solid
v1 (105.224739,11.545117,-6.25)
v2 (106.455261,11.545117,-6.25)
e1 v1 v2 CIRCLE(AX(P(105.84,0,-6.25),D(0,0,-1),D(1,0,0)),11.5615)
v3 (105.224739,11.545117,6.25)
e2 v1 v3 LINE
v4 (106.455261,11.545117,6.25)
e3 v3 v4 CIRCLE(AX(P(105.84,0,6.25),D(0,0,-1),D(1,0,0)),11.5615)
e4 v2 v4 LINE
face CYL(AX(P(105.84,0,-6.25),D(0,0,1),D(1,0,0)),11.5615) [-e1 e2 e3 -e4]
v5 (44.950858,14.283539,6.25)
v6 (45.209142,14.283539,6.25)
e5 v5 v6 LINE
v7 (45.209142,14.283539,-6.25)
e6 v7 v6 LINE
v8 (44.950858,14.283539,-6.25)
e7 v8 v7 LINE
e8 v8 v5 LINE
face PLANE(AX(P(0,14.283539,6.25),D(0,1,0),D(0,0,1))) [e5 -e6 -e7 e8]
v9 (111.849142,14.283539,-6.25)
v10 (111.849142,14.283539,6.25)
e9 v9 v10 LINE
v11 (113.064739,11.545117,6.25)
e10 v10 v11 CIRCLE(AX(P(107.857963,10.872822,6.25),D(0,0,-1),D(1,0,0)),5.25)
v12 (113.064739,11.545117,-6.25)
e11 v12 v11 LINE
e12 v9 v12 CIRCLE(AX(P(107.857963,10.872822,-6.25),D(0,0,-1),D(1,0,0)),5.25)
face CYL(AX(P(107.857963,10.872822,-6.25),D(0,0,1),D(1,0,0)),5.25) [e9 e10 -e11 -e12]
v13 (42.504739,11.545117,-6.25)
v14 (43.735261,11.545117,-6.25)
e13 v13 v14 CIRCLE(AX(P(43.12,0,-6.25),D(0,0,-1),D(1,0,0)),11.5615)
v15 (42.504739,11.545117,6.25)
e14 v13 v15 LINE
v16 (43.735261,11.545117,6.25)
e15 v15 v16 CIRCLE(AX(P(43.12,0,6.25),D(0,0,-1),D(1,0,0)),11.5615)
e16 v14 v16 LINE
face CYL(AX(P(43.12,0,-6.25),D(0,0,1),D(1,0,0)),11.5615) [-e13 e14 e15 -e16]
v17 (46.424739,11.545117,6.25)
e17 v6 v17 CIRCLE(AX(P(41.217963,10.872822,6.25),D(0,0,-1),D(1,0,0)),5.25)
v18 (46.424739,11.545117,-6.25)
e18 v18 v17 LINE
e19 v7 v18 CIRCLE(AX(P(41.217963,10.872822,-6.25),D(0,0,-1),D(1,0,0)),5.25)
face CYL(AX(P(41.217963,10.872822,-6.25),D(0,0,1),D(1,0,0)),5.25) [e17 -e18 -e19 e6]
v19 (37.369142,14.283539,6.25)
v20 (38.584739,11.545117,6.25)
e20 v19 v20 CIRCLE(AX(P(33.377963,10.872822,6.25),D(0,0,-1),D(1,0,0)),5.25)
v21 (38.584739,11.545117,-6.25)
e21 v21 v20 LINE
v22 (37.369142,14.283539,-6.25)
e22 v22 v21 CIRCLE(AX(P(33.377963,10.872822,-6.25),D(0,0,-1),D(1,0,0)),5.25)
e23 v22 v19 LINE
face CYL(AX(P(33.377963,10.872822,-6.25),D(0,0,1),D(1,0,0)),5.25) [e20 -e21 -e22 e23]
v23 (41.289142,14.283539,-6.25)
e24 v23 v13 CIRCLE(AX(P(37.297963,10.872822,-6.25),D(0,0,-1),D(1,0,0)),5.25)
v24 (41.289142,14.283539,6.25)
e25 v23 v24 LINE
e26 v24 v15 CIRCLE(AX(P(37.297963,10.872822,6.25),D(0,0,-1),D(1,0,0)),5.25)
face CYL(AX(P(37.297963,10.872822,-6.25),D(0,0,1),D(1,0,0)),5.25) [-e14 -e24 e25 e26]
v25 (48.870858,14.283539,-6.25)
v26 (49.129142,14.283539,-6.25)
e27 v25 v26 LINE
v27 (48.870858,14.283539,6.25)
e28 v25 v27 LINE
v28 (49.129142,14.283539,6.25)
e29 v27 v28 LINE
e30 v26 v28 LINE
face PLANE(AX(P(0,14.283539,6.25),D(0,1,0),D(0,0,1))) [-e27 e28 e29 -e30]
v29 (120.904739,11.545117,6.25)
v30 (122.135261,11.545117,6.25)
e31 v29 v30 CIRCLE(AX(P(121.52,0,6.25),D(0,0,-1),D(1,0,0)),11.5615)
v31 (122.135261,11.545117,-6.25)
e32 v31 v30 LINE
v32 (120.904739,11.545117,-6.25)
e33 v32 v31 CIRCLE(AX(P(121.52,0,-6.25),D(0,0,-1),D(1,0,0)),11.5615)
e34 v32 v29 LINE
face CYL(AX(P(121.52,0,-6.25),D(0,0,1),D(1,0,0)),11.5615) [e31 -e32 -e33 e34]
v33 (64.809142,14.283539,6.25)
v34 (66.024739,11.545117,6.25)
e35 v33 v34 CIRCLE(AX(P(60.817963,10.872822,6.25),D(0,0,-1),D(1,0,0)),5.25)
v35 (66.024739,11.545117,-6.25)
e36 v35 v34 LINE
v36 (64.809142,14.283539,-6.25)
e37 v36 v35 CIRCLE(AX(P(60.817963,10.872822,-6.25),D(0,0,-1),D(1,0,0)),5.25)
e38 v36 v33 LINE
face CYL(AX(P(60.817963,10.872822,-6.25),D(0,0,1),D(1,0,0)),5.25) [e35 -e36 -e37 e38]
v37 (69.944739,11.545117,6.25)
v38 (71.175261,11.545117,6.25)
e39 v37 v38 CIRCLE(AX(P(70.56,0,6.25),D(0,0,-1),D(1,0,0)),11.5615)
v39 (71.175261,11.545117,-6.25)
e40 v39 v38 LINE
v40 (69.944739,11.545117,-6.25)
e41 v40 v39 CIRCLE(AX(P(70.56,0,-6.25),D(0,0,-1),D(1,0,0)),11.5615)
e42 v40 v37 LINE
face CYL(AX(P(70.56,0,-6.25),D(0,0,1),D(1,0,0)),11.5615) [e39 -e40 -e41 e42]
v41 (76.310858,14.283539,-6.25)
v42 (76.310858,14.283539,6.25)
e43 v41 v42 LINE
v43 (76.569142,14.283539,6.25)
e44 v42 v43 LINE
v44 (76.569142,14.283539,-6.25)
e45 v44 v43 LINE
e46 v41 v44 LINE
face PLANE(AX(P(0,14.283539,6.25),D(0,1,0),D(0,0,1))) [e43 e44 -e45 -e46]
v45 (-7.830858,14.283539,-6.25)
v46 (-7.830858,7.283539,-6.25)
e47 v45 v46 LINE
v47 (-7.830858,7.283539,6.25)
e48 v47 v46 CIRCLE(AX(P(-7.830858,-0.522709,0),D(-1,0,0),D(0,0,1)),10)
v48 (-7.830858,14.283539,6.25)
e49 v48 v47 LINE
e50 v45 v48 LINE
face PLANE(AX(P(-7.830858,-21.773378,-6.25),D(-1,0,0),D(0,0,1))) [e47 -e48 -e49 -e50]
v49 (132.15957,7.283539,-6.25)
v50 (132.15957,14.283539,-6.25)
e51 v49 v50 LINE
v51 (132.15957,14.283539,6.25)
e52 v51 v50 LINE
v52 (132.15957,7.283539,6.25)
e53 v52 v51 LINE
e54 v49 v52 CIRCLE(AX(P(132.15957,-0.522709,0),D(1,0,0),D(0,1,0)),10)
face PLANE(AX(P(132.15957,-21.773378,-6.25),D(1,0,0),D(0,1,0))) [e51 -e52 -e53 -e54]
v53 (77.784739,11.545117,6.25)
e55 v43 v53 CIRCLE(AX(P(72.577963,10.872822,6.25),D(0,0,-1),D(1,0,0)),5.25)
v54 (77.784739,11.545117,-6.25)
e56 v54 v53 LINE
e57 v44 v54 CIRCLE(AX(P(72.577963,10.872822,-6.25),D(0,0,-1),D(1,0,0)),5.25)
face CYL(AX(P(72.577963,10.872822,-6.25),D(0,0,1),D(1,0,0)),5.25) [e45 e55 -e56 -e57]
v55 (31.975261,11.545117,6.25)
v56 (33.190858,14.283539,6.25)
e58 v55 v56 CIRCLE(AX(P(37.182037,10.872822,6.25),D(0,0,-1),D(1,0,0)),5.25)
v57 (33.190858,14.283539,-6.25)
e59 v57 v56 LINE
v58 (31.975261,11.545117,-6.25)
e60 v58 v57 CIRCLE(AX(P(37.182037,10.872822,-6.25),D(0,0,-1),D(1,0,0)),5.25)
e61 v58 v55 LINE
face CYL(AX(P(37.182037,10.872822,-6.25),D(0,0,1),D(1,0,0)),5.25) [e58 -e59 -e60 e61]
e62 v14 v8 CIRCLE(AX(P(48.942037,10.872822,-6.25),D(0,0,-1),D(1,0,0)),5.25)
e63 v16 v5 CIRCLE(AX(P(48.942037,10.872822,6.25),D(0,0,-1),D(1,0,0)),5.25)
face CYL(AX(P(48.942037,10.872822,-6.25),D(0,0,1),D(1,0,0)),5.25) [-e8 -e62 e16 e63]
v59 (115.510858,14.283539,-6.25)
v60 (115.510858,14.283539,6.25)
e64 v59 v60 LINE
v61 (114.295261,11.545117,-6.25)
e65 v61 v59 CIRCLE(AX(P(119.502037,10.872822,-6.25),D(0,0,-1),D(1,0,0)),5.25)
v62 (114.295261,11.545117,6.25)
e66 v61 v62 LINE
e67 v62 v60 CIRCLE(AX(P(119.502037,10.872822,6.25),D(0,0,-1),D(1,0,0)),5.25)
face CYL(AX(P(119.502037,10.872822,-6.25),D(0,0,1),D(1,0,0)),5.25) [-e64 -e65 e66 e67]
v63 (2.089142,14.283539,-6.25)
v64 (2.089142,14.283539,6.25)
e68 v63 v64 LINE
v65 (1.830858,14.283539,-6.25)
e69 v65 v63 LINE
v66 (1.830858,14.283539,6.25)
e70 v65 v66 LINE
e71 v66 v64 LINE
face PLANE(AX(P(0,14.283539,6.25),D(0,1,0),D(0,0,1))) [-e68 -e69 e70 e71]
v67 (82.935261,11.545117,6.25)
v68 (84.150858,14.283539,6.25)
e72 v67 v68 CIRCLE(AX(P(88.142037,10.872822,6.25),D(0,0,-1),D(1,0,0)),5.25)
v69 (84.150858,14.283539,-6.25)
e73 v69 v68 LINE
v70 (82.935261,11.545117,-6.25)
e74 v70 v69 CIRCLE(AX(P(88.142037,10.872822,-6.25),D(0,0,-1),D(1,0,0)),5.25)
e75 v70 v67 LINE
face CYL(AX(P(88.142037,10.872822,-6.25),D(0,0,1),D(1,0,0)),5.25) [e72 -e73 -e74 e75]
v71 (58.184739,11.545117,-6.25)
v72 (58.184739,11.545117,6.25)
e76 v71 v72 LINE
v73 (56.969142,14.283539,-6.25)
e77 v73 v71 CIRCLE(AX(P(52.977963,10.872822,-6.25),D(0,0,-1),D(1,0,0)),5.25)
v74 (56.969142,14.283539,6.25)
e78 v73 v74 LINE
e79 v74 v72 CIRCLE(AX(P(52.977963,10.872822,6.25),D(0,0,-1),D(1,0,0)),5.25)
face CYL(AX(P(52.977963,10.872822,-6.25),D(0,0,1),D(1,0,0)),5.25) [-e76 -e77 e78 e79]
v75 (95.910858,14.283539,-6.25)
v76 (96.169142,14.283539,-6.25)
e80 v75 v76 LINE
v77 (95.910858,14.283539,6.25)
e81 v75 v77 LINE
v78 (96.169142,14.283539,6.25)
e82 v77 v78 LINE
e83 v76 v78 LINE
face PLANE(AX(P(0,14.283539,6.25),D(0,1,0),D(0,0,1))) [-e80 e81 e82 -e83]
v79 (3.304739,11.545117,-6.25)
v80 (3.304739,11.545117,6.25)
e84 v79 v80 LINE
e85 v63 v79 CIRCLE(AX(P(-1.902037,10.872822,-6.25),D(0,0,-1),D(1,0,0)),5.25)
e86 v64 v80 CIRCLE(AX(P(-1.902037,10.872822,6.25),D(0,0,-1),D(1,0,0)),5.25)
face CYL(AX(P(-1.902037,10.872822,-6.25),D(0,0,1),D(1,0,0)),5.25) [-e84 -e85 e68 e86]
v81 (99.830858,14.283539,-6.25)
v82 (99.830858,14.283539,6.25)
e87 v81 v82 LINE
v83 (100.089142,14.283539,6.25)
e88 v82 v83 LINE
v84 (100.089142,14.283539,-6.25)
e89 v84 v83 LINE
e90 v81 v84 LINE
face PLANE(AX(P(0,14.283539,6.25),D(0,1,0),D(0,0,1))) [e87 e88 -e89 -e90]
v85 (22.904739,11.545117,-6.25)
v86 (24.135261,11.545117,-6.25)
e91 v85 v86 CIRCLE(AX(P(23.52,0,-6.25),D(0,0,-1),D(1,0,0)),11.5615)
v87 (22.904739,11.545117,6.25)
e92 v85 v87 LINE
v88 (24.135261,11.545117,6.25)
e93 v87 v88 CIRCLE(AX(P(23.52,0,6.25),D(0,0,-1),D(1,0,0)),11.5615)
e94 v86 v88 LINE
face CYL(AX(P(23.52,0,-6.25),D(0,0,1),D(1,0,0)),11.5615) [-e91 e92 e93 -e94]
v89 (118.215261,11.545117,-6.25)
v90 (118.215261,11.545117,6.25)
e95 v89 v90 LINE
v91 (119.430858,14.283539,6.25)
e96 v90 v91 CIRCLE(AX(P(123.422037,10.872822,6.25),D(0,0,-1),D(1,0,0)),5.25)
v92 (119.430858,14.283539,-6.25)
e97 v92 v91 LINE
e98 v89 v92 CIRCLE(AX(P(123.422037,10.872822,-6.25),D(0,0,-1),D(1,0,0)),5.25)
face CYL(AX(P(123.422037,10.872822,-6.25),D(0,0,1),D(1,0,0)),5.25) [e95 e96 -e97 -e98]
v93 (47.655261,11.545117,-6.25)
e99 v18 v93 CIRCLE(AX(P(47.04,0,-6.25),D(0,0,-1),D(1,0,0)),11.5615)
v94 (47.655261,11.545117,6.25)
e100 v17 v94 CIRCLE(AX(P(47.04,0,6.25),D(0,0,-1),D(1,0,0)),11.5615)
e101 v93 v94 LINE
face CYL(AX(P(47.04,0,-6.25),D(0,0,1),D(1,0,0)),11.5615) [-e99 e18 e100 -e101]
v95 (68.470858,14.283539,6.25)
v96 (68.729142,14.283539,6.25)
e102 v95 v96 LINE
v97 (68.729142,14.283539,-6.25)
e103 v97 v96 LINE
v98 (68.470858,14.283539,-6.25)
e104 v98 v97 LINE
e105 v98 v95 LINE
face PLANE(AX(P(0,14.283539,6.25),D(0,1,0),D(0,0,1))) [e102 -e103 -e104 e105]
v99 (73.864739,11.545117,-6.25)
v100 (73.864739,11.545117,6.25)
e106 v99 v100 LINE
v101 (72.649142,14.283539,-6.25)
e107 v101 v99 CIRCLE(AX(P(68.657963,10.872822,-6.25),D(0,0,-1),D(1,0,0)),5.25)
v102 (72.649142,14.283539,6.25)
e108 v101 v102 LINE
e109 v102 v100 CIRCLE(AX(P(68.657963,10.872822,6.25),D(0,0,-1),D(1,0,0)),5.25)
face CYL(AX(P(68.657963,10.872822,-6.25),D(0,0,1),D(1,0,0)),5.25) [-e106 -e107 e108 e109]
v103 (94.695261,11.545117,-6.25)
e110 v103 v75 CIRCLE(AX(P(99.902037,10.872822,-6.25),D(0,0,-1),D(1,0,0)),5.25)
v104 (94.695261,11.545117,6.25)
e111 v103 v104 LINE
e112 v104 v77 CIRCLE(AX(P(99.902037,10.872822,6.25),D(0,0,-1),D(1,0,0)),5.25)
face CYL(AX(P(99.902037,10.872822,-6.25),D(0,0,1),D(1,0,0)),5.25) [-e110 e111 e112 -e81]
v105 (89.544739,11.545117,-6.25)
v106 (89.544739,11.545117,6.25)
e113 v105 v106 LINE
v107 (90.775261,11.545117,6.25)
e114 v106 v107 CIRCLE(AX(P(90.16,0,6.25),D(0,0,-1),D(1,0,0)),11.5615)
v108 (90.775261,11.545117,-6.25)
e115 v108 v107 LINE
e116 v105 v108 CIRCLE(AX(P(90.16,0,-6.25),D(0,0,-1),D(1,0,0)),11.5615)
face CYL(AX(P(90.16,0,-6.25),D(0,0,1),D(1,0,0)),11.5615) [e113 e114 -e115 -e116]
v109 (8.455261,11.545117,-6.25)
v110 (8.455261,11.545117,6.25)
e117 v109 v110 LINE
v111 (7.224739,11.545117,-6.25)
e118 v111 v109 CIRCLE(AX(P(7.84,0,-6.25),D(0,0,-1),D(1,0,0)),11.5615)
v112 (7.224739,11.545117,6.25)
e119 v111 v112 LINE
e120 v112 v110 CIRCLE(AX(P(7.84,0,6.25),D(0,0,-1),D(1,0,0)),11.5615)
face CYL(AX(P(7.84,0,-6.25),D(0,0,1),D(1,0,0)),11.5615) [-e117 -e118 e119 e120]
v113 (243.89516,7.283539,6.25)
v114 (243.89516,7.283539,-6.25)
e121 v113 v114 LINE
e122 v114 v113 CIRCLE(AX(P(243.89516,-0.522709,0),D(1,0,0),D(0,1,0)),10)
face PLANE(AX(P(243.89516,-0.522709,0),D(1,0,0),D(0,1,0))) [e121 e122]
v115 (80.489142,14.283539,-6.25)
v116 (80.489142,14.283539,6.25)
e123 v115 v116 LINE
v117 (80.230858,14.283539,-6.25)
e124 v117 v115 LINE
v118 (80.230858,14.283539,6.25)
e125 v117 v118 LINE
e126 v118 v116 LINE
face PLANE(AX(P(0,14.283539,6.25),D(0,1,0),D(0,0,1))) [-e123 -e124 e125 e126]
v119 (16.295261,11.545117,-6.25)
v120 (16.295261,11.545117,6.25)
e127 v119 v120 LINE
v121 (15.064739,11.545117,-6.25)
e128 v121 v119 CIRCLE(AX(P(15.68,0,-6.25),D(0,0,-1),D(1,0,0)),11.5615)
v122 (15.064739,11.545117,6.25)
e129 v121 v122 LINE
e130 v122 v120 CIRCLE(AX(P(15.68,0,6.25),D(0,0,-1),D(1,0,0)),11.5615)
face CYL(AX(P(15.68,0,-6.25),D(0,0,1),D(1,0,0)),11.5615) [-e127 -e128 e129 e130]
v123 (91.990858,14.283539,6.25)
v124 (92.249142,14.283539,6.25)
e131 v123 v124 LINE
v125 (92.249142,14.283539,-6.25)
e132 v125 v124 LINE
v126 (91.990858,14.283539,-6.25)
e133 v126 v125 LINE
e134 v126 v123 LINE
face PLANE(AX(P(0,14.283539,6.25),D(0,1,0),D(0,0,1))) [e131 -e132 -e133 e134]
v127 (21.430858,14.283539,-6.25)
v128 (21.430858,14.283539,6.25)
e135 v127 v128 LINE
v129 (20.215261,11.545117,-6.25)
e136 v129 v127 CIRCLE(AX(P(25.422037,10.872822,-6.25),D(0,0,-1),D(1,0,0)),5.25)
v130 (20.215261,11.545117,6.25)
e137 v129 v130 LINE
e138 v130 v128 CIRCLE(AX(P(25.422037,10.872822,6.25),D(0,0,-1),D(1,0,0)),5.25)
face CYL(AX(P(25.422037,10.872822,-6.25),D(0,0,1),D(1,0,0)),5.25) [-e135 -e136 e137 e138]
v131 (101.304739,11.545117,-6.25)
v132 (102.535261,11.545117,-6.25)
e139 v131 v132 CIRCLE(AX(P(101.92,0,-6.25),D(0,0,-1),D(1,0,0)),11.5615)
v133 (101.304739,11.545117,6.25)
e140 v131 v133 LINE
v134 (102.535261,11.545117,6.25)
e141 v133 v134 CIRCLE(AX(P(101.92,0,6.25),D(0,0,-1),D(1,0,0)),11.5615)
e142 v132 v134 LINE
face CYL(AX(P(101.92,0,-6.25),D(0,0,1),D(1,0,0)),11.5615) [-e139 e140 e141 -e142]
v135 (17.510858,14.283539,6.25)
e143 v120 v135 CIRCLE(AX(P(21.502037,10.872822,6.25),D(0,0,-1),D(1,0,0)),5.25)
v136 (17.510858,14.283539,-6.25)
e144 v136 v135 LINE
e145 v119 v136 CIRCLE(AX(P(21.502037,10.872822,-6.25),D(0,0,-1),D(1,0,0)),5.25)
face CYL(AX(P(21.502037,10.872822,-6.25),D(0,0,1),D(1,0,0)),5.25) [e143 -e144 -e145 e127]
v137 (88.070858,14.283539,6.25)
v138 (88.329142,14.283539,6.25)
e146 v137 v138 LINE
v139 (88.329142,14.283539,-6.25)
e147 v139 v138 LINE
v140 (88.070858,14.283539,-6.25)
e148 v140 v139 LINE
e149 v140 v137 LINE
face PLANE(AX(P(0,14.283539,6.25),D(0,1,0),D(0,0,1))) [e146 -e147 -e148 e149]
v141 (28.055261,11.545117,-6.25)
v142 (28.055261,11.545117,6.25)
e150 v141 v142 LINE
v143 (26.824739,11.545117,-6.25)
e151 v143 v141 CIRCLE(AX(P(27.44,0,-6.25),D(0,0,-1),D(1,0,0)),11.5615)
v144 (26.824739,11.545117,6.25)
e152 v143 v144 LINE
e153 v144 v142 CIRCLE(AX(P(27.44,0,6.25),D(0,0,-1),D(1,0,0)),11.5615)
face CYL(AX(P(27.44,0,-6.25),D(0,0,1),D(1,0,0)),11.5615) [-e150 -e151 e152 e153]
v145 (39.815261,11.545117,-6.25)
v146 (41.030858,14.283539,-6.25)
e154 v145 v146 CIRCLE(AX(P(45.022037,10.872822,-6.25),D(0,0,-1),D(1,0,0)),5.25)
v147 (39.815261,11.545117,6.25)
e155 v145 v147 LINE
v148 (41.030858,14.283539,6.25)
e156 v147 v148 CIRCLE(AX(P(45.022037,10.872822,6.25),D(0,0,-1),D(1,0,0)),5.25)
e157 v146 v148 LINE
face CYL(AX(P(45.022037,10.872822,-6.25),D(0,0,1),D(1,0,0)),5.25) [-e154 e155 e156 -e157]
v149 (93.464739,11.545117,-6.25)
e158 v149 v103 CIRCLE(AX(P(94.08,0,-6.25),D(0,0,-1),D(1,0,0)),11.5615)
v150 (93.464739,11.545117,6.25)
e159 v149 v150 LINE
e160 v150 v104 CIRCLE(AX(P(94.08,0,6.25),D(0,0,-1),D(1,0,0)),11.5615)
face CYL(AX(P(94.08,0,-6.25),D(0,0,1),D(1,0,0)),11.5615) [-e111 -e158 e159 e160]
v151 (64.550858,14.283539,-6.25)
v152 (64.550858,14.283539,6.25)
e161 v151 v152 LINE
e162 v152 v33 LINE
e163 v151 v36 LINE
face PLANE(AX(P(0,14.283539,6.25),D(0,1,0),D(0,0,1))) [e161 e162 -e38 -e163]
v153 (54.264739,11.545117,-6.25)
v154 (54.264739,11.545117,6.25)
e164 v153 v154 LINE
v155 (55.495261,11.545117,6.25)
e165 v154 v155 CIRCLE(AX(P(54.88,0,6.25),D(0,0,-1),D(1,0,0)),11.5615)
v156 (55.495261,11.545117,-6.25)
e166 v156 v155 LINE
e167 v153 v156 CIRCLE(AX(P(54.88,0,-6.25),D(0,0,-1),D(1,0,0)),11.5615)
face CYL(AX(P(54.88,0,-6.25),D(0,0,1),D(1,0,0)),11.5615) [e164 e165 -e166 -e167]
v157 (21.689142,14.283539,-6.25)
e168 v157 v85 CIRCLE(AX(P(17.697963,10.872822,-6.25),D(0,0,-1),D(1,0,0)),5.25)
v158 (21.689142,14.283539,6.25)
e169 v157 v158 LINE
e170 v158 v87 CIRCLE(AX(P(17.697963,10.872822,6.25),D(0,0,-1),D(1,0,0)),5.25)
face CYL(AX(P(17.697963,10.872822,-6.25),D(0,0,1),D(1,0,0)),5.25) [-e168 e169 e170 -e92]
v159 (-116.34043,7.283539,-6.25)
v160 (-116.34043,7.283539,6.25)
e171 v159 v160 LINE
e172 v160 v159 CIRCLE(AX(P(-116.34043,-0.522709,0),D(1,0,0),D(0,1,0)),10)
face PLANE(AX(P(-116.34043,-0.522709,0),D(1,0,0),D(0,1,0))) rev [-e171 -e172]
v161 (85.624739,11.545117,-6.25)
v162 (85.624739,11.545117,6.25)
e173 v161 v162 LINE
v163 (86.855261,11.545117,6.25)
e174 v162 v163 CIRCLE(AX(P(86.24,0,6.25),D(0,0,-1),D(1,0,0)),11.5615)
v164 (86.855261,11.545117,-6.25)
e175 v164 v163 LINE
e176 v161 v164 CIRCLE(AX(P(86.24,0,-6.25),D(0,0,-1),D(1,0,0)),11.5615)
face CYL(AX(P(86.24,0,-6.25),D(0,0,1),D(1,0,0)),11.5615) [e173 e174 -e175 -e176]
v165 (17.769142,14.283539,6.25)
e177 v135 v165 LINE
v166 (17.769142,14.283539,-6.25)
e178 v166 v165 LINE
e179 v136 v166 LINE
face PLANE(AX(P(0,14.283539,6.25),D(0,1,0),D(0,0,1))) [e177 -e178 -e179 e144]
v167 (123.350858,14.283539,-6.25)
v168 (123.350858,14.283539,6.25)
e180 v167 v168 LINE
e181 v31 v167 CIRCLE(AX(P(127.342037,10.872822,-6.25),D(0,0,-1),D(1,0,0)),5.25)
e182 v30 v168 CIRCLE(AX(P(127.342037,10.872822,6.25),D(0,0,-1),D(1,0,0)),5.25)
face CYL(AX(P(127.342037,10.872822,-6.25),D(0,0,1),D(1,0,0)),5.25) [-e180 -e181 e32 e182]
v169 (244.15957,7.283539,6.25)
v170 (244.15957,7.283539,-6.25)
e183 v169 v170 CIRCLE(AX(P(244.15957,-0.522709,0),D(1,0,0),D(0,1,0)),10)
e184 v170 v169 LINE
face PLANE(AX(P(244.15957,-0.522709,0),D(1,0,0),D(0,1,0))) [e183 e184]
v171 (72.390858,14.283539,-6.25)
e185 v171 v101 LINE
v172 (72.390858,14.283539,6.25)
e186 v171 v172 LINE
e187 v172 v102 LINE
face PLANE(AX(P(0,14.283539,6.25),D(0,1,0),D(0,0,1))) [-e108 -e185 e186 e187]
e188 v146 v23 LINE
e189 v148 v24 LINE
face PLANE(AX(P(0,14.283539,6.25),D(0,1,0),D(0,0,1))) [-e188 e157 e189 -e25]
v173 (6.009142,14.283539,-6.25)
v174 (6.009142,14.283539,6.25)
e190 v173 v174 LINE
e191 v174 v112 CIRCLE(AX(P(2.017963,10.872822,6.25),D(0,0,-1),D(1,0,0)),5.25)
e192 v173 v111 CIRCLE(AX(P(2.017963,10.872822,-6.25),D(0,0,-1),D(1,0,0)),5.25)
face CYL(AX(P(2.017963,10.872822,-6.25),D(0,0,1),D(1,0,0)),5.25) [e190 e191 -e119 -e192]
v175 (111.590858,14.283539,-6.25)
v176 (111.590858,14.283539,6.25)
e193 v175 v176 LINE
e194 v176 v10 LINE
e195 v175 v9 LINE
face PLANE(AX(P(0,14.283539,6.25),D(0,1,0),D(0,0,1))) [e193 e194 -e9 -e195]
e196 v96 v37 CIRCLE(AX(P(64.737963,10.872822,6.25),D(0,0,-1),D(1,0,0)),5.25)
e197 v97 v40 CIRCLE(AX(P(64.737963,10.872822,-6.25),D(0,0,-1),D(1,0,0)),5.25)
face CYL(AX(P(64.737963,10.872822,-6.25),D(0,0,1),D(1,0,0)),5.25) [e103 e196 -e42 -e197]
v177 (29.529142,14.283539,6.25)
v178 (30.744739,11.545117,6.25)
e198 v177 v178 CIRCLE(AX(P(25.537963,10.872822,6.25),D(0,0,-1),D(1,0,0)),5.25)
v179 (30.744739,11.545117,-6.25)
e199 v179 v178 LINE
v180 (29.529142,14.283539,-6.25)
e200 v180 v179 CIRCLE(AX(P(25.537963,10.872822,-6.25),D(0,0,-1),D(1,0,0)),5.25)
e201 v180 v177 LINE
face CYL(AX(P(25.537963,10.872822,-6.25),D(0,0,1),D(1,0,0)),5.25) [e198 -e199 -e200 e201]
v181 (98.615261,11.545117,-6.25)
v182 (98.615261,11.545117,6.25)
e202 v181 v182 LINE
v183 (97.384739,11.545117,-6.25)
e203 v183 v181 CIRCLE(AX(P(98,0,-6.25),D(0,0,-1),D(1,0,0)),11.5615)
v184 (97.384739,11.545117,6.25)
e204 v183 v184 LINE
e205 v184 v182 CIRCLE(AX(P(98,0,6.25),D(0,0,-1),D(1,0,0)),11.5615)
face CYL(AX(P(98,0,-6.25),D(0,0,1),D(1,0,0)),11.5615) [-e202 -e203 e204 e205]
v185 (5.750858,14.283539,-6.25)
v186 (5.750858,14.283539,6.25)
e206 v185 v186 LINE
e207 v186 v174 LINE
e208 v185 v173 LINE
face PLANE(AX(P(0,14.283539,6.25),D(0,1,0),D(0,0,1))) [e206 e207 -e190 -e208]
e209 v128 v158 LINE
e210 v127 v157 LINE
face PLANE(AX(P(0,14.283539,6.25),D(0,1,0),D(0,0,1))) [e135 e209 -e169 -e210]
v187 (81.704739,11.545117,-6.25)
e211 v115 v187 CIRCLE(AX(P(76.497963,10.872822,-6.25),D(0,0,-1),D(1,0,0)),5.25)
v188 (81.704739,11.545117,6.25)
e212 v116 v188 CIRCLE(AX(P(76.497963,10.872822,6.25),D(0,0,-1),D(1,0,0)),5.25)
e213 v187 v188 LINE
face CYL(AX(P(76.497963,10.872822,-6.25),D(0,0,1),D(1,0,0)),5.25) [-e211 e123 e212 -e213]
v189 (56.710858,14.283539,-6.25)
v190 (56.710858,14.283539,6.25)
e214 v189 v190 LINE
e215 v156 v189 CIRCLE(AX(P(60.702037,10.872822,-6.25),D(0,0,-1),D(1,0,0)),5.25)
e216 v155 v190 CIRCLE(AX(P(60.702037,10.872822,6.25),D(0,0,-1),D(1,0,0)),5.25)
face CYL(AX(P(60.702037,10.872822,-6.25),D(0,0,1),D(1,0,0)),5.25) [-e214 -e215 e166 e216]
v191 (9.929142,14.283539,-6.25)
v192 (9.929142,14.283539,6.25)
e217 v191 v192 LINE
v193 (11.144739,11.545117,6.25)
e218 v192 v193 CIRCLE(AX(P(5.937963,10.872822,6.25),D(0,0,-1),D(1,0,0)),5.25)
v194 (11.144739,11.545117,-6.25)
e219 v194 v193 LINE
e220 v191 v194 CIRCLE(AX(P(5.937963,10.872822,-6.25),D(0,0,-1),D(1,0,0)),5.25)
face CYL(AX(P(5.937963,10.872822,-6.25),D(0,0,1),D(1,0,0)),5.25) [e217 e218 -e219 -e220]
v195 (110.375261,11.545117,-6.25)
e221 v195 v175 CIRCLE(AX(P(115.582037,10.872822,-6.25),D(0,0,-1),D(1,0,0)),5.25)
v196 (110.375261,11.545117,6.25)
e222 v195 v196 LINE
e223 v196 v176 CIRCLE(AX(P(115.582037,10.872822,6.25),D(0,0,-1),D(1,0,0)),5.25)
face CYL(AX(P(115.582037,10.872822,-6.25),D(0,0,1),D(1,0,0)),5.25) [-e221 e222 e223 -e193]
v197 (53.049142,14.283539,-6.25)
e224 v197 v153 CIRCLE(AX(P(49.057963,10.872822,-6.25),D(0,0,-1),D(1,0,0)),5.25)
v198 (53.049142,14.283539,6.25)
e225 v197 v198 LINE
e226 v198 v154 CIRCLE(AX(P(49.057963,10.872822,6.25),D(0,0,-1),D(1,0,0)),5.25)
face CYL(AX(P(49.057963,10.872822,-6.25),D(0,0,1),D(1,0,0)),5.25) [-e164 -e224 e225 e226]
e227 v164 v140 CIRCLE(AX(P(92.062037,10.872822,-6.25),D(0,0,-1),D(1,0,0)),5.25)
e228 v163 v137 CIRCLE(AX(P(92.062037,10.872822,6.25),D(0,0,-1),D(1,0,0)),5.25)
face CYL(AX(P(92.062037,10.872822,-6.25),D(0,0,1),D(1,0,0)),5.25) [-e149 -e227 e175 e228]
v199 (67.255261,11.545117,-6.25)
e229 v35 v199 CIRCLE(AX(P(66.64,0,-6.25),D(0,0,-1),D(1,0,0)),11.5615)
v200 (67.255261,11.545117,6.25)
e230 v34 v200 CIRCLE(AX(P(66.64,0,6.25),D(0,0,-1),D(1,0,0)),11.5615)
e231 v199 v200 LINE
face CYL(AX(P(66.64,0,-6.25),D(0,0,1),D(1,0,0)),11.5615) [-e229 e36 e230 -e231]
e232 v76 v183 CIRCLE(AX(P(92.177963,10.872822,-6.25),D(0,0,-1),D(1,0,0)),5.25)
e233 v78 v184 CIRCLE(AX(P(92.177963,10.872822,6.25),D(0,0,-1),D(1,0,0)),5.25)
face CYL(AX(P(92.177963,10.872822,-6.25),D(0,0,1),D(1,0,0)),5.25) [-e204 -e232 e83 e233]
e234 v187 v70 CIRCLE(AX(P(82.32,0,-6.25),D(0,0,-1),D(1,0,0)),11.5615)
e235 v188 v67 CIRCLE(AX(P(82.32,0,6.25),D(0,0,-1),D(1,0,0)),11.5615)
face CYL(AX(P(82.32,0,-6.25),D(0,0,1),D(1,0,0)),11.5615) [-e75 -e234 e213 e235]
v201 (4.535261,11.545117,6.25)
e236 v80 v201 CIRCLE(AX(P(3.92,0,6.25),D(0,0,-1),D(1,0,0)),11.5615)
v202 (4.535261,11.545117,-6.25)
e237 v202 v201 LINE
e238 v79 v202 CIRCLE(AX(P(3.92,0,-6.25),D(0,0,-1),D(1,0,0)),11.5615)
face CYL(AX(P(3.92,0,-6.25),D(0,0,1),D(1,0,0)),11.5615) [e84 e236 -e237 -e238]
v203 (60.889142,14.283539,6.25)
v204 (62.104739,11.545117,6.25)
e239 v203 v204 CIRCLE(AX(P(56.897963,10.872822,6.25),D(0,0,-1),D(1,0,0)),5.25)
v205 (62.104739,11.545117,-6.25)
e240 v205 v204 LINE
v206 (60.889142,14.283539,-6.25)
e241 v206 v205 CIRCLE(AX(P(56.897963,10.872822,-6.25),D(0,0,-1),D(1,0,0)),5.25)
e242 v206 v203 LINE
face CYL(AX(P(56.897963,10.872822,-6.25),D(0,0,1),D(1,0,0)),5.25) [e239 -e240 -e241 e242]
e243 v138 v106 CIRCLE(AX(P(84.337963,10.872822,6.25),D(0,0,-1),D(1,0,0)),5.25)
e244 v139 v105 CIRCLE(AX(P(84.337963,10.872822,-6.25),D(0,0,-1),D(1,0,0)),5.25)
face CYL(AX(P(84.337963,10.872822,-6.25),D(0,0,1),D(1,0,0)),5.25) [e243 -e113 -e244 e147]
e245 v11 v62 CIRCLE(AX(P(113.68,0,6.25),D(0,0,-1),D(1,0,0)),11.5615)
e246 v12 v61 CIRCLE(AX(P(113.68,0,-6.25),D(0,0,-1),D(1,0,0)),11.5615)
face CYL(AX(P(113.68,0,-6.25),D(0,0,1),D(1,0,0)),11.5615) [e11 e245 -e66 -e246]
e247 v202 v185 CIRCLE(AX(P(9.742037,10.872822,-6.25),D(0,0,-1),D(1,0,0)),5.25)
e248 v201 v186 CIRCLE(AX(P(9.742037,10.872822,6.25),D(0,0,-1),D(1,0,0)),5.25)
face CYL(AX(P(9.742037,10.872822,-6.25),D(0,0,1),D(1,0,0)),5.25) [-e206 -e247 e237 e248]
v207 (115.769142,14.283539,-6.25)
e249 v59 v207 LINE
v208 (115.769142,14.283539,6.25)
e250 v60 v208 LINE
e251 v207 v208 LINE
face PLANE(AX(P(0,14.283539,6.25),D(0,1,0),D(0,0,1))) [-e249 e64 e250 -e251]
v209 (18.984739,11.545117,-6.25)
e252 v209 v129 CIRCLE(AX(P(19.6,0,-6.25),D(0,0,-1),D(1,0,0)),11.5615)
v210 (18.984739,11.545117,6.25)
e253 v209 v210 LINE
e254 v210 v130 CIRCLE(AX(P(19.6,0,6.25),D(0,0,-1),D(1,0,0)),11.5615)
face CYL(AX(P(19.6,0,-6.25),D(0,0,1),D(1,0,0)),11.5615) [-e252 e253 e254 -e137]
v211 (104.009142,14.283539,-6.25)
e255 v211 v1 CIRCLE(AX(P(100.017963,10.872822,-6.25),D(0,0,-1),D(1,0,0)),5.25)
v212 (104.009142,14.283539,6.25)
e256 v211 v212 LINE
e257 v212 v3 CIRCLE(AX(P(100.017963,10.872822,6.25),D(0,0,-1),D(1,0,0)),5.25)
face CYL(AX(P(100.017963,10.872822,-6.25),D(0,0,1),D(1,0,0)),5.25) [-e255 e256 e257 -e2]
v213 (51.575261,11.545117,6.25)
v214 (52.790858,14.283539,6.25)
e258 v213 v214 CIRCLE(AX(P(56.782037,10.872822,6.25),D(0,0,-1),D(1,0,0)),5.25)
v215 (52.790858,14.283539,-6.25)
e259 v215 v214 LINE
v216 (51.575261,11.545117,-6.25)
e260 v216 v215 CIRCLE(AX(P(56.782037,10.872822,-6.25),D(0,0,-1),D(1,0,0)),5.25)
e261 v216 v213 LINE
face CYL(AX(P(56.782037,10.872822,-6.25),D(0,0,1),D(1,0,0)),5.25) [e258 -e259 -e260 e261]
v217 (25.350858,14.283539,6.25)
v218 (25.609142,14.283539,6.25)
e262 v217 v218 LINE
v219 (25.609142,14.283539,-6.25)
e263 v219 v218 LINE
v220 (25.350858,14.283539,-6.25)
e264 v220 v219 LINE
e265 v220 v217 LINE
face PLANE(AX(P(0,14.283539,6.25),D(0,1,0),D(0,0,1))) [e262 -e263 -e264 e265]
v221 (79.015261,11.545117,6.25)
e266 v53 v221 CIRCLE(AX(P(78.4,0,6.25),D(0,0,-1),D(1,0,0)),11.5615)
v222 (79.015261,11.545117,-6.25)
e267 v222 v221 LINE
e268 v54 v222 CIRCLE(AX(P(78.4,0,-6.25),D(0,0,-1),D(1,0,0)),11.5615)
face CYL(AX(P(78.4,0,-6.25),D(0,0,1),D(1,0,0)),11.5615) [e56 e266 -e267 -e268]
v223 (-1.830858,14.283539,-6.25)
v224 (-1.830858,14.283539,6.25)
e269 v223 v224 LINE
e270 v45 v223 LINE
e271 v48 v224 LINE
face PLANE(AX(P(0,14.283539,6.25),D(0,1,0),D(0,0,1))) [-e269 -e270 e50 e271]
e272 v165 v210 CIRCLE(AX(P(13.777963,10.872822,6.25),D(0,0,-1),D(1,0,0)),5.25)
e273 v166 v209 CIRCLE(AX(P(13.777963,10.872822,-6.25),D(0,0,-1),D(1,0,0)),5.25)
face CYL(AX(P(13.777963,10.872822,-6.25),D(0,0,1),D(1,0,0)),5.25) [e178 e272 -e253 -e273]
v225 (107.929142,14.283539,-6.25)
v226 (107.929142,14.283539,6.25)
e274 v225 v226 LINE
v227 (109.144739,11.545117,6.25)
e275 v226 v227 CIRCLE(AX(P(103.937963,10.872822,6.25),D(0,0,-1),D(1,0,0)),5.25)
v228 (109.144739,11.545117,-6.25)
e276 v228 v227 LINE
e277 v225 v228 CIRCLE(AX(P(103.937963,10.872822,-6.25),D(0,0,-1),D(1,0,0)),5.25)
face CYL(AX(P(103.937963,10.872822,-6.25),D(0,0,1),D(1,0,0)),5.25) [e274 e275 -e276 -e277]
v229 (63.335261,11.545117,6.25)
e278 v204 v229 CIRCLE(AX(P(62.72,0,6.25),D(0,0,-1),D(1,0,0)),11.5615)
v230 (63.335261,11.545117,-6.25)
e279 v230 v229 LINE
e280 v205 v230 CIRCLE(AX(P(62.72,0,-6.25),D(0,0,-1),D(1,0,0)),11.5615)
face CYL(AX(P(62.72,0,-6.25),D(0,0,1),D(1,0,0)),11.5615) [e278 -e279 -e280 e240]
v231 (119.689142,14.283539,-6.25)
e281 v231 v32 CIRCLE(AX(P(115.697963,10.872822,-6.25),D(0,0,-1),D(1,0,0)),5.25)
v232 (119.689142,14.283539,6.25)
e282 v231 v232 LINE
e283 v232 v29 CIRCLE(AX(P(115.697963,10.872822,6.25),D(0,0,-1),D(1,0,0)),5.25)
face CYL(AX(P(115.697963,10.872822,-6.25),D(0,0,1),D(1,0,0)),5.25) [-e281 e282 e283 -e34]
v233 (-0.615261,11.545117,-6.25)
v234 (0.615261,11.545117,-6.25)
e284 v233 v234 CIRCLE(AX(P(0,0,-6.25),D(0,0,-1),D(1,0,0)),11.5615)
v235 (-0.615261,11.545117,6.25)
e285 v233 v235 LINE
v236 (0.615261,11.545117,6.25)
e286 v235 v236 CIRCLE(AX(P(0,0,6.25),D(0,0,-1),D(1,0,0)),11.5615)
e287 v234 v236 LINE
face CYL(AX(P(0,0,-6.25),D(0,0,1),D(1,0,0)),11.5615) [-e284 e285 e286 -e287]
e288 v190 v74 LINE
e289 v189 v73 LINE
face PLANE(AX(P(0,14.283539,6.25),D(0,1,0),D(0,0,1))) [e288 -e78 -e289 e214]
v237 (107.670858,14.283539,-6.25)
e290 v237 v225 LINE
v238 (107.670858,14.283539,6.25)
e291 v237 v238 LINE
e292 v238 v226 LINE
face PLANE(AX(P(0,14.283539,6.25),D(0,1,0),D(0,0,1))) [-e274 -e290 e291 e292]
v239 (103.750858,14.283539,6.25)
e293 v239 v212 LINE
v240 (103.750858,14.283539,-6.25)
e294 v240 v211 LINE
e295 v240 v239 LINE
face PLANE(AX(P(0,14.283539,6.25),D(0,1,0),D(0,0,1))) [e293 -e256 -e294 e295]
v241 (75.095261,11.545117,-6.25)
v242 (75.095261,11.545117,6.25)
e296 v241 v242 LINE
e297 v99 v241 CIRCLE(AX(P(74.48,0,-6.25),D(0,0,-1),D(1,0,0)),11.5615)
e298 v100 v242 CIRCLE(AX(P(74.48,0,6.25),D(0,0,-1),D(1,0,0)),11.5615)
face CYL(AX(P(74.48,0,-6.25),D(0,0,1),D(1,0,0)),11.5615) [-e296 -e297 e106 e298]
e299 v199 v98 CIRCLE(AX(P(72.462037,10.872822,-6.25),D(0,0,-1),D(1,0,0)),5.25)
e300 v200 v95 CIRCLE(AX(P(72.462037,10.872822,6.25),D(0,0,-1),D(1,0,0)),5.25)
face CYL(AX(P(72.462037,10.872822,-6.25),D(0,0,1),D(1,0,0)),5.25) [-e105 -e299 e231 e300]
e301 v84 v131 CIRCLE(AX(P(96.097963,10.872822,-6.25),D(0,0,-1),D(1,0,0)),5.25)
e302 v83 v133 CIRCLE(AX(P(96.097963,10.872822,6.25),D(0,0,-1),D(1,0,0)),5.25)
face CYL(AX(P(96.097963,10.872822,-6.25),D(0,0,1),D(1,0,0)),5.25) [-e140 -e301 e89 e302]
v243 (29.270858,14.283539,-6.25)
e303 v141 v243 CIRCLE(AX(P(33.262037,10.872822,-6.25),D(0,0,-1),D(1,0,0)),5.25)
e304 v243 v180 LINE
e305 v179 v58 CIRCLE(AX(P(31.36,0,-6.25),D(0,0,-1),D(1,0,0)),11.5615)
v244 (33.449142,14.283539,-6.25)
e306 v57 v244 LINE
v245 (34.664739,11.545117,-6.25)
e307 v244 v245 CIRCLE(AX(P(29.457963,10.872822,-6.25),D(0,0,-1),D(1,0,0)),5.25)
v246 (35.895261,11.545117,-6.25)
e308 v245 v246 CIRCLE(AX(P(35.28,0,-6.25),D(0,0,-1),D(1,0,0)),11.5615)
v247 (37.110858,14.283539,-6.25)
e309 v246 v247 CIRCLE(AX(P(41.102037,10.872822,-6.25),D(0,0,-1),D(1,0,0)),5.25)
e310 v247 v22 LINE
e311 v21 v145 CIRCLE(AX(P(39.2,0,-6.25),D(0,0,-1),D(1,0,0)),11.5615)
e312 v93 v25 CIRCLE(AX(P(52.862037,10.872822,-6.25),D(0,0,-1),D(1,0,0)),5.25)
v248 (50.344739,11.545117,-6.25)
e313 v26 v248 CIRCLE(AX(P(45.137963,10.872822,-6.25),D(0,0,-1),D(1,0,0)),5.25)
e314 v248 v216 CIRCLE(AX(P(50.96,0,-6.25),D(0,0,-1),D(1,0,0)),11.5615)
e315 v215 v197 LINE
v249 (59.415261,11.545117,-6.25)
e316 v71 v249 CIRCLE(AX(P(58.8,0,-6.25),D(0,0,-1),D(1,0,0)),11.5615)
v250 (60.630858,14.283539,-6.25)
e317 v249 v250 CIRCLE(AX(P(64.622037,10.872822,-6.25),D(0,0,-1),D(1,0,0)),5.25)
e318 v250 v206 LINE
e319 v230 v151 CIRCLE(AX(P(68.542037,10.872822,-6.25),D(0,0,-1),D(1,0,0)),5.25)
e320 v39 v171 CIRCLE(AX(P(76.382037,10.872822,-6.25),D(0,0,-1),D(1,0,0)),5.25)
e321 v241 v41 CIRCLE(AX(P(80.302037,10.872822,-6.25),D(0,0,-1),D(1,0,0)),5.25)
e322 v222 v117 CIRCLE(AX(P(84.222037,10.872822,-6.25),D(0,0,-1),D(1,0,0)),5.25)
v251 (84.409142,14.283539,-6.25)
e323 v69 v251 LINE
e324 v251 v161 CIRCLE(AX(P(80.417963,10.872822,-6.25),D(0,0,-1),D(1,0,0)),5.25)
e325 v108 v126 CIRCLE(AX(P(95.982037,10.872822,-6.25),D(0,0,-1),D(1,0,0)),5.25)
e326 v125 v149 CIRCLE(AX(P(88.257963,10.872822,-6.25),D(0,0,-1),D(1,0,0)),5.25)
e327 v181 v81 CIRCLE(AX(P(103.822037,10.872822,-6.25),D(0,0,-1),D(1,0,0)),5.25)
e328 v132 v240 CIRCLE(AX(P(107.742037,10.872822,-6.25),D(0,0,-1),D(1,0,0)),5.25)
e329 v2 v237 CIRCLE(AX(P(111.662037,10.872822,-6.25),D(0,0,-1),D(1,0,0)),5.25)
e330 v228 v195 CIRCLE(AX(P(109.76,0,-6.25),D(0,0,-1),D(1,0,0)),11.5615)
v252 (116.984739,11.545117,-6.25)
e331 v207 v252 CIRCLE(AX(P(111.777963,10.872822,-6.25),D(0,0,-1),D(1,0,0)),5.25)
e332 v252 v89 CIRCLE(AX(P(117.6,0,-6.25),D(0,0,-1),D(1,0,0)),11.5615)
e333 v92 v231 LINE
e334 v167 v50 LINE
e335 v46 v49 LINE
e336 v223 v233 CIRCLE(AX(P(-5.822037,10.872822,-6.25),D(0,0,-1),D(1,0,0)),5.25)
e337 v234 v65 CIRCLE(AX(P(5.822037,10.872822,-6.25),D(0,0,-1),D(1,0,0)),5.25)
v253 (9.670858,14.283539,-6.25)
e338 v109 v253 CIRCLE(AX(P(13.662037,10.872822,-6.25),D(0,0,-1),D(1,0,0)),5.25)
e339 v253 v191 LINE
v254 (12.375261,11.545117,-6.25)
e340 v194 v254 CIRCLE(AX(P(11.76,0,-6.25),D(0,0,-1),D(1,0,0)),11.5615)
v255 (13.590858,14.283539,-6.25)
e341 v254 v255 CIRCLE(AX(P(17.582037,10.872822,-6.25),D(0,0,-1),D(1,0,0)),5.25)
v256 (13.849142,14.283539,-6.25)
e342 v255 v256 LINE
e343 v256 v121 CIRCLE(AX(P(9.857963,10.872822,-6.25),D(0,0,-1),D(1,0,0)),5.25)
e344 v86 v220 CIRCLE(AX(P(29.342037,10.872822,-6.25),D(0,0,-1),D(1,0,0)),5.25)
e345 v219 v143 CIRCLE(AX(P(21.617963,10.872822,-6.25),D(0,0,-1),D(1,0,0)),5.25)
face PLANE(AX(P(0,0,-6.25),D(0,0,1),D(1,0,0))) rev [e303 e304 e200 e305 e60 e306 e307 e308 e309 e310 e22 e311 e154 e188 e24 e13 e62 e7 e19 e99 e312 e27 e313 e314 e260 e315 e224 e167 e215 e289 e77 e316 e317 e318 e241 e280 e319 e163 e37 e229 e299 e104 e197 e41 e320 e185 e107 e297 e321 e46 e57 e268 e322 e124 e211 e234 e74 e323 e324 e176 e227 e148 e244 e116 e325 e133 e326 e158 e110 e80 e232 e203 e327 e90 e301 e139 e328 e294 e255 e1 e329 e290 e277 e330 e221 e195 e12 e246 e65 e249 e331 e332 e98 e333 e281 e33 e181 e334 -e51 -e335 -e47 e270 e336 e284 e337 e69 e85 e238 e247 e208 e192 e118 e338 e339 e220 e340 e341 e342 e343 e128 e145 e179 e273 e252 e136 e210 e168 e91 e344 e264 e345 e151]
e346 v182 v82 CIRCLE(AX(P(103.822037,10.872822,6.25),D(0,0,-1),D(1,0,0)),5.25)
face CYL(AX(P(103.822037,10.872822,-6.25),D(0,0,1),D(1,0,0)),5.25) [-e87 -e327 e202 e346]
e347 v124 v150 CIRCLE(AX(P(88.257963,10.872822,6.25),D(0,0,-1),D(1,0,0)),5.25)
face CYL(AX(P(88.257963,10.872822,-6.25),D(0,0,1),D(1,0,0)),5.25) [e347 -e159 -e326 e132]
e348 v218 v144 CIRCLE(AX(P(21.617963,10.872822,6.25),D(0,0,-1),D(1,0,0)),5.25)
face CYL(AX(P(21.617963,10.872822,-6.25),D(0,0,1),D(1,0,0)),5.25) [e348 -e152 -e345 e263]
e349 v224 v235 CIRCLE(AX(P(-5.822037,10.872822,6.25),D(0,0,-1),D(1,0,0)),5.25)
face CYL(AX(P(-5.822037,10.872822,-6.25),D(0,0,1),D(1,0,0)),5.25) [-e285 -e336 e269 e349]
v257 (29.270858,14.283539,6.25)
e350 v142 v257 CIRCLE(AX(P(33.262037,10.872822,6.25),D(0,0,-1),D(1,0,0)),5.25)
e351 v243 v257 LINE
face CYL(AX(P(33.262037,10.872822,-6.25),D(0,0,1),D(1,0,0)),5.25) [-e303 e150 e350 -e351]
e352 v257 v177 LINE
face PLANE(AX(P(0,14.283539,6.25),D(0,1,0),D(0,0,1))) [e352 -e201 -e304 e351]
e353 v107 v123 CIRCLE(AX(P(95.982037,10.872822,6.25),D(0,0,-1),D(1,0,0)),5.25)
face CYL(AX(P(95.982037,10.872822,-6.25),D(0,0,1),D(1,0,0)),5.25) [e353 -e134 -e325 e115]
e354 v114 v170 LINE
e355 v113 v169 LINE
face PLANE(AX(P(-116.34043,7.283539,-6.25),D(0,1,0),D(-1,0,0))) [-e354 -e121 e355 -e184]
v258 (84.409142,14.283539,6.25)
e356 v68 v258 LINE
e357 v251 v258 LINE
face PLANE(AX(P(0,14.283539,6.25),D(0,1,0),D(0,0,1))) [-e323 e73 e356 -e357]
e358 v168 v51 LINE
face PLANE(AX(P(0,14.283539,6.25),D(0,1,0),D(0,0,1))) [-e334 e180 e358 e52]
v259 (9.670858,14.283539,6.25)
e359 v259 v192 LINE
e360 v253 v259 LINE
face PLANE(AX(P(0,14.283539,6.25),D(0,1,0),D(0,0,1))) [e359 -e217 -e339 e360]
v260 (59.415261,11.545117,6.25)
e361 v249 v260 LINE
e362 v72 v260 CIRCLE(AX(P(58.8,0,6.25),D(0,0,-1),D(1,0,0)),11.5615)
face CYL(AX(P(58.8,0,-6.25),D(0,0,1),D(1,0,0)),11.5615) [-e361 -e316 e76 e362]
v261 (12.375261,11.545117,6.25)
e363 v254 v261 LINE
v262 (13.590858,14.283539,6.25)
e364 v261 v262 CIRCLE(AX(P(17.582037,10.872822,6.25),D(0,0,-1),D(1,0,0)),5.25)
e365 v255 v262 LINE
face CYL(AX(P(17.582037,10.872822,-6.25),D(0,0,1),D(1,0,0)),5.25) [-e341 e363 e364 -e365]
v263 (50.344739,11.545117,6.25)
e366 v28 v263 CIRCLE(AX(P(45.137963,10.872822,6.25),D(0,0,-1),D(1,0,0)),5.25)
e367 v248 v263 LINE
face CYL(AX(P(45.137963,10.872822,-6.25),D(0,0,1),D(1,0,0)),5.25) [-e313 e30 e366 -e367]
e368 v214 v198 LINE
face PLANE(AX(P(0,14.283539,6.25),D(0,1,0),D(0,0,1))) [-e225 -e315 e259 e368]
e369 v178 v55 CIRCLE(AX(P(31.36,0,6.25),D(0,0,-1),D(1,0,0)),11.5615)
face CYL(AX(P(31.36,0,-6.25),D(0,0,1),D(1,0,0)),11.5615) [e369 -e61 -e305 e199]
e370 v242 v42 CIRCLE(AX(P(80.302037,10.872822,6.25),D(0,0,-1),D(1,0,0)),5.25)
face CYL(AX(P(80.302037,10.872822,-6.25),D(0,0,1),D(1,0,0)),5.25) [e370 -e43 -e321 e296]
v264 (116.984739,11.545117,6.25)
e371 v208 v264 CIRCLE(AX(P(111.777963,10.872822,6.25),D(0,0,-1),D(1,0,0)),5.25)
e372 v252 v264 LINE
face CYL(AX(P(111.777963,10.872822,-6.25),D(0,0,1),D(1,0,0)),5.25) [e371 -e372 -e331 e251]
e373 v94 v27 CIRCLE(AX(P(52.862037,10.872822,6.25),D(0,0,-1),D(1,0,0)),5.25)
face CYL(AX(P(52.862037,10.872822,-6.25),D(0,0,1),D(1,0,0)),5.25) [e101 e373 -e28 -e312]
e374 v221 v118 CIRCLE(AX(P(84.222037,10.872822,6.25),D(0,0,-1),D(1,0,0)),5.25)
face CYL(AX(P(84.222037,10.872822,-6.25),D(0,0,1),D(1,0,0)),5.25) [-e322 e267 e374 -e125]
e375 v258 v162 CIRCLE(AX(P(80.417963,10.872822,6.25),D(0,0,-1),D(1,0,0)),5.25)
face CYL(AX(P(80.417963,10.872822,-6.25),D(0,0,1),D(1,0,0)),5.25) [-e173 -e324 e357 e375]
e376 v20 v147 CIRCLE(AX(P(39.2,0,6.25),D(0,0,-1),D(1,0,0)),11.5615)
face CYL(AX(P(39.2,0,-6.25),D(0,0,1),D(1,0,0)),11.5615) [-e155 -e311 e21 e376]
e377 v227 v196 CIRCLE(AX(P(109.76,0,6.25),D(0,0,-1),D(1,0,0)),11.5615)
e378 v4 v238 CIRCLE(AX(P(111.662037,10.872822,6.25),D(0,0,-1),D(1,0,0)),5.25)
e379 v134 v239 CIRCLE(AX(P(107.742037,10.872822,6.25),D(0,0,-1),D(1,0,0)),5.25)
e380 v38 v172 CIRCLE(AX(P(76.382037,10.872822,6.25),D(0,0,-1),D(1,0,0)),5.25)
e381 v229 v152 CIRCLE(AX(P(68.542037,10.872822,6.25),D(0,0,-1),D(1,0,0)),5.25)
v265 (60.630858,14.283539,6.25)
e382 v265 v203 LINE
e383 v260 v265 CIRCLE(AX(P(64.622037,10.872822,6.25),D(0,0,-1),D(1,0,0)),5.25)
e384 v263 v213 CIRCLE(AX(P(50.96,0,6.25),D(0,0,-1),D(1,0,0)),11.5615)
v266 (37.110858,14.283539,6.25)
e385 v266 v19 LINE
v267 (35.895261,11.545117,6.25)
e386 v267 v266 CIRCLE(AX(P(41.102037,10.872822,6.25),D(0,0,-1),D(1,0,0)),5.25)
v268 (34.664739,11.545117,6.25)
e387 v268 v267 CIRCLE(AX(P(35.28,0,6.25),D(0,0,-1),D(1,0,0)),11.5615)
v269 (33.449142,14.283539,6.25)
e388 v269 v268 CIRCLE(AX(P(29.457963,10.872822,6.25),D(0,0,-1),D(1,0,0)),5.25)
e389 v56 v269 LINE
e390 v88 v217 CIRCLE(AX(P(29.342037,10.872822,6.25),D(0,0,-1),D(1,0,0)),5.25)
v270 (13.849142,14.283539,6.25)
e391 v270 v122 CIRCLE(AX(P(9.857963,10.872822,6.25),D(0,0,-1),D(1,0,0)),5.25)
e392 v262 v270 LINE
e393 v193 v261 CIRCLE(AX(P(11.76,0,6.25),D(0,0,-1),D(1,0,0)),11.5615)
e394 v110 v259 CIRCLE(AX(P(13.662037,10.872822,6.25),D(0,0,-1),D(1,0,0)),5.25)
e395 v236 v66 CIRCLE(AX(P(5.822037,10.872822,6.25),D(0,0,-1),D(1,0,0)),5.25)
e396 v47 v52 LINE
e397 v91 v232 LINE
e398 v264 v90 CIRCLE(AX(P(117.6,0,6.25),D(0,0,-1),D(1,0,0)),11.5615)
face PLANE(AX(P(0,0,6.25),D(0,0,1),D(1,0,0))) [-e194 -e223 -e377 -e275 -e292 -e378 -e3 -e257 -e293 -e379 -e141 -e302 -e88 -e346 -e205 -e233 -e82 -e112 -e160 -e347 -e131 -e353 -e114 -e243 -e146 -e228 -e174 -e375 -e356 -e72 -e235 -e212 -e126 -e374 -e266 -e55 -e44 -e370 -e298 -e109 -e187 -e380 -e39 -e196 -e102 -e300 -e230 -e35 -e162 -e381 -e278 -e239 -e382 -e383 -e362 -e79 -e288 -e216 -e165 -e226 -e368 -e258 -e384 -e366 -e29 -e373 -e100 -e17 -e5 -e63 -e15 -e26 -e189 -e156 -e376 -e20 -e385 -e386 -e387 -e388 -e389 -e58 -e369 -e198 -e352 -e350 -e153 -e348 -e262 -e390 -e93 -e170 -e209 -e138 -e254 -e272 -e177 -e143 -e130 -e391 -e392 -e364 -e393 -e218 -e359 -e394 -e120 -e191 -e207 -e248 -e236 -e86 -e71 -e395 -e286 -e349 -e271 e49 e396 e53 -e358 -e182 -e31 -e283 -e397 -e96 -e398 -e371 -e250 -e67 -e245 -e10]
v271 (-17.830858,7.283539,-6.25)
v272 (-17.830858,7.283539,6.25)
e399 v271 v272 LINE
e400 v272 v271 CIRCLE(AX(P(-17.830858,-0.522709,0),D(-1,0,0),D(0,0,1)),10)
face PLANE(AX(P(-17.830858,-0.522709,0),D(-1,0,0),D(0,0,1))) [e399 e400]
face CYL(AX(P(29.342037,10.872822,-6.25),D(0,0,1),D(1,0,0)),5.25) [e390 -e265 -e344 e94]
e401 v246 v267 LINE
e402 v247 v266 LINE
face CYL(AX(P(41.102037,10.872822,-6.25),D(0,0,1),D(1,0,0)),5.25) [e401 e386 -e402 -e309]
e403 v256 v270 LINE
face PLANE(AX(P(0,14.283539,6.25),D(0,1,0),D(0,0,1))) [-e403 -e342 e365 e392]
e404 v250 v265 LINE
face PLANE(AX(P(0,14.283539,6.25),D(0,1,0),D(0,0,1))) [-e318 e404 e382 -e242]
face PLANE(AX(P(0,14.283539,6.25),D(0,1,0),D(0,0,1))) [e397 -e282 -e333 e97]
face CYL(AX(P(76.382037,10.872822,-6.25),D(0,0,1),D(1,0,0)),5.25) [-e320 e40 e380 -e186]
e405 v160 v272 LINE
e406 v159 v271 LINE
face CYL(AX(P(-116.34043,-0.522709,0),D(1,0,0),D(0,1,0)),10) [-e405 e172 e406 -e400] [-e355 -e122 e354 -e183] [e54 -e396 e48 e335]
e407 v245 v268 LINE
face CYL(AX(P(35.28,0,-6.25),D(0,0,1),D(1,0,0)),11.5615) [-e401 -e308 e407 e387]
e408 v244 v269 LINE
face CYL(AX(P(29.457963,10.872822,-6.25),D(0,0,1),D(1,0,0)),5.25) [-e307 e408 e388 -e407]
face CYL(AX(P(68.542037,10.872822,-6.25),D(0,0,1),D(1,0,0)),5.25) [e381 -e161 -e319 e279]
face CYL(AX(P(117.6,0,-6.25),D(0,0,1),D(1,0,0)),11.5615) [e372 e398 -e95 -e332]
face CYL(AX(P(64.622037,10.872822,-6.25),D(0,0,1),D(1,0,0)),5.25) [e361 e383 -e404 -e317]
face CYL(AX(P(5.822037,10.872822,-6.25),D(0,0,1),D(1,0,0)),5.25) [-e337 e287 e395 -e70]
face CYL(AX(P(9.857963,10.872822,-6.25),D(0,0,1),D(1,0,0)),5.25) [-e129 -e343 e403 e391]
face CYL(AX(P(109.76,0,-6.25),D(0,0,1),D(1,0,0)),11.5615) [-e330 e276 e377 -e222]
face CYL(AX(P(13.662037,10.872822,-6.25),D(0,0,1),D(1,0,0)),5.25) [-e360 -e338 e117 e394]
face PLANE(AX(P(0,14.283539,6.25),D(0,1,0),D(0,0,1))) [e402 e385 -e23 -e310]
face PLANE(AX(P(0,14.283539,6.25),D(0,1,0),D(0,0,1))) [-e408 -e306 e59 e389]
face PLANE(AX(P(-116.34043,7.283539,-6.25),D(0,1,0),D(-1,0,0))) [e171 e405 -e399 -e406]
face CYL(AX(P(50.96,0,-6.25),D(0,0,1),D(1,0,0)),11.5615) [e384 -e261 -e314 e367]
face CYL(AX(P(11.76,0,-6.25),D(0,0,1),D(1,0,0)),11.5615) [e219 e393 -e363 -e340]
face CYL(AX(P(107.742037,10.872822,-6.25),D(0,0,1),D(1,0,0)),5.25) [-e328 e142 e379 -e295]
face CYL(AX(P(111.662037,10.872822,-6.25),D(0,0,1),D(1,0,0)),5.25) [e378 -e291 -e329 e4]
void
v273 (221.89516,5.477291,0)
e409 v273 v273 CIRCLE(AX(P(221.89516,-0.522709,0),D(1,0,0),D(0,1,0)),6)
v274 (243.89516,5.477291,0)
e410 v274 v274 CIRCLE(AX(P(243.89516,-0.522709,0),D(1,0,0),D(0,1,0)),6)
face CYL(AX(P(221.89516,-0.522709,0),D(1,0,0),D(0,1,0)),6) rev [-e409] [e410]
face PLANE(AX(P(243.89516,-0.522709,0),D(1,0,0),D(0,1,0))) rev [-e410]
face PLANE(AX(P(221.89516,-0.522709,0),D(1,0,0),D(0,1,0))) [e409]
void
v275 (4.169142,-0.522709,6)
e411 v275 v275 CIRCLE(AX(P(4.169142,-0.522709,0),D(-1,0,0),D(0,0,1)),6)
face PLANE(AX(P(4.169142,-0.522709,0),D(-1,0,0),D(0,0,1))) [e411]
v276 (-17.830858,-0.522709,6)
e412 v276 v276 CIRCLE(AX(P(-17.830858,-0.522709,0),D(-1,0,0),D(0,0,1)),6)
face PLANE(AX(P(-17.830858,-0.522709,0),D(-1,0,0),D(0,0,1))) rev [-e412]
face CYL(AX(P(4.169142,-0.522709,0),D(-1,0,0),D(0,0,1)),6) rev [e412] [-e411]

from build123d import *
from build123d.topology import SkipClean

# Parameters (mm, degrees)
SKETCH1_W                = 150
SKETCH1_H                = 7
BOSS_EXTRUDE2_DEPTH      = 6.25
CUT_EXTRUDE1_DEPTH       = 140.036501376
LPATTERN1_COUNT          = 32
LPATTERN1_PITCH          = 3.92
CUT_EXTRUDE2_START       = -6.25
CUT_EXTRUDE2_OUTLINE_W   = 4.009572156
CUT_EXTRUDE2_OUTLINE_H   = 7
CUT_EXTRUDE2_OUTLINE_W_2 = 6
CUT_EXTRUDE2_DEPTH       = 12.5
BOSS_EXTRUDE3_DEPTH      = 112
BOSS_EXTRUDE3_DEPTH_BACK = 248.5
SKETCH7_R                = 10
BOSS_EXTRUDE4_DEPTH      = 111.735590033
SKETCH8_R                = 6
CUT_EXTRUDE3_DEPTH       = 22
BOSS_EXTRUDE5_START      = 10
SKETCH10_R               = 10
BOSS_EXTRUDE5_DEPTH      = 10
CUT_EXTRUDE5_START       = -22
SKETCH11_R               = 6
CUT_EXTRUDE5_DEPTH       = 22


# Read off the part's stored shape, not the designer's step: Cut-Extrude2
with BuildPart() as part:
    # Sketch1 → Boss-Extrude2 (new, symmetric)
    with BuildSketch(Plane.XY):
        with Locations((63.159569831, 10.783538746)):
            Rectangle(SKETCH1_W, SKETCH1_H)
    extrude(amount=BOSS_EXTRUDE2_DEPTH, both=True)

    # Sketch2 → Cut-Extrude1 (cut, symmetric)
    with BuildSketch(Plane.XY):
        with BuildLine():
            ThreePointArc((0.615260942, 11.545117419), (0, 11.5615), (-0.615260942, 11.545117419))
            ThreePointArc((-0.615260942, 11.545117419), (-1.023565158, 13.002884474), (-1.830858013, 14.283538746))
            ThreePointArc((-1.830858013, 14.283538746), (0, 14.4004), (1.830858013, 14.283538746))
            ThreePointArc((1.830858013, 14.283538746), (1.023565158, 13.002884474), (0.615260942, 11.545117419))
        make_face()
    cut_extrude1 = extrude(amount=CUT_EXTRUDE1_DEPTH, both=True, mode=Mode.SUBTRACT)

    # LPattern1: Cut-Extrude1 ×32
    with Locations(*[(i * LPATTERN1_PITCH, 0, 0) for i in range(1, LPATTERN1_COUNT)]):
        add(cut_extrude1, mode=Mode.SUBTRACT)

    # Cut-Extrude2 outline → Cut-Extrude2 (cut)
    with BuildSketch(Plane.XY.offset(CUT_EXTRUDE2_START)):
        with Locations((-9.835644091, 10.783538746)):
            Rectangle(CUT_EXTRUDE2_OUTLINE_W, CUT_EXTRUDE2_OUTLINE_H)
        with Locations((135.159569831, 10.783538746)):
            Rectangle(CUT_EXTRUDE2_OUTLINE_W_2, CUT_EXTRUDE2_OUTLINE_H)
    extrude(amount=CUT_EXTRUDE2_DEPTH, mode=Mode.SUBTRACT)

    # Sketch5 → Boss-Extrude3 (add, two sides: drawn at the far end of the back side and taken through both)
    with BuildSketch(Plane(origin=(132.159569831, 0, 0), x_dir=(0, 0, -1), z_dir=(1, 0, 0)).offset(-BOSS_EXTRUDE3_DEPTH_BACK)):
        with BuildLine():
            Line((6.25, 7.283538746), (-6.25, 7.283538746))
            ThreePointArc((-6.25, 7.283538746), (0, -10.522708752), (6.25, 7.283538746))
        make_face()
    extrude(amount=BOSS_EXTRUDE3_DEPTH + BOSS_EXTRUDE3_DEPTH_BACK)

    # Sketch7 → Boss-Extrude4 (add)
    with BuildSketch(Plane(origin=(132.159569831, 0, 0), x_dir=(0, 0, -1), z_dir=(1, 0, 0))):
        with Locations(Location((0, -0.522708752, 0), (0, 0, 128.682187453))):
            Circle(SKETCH7_R)
    extrude(amount=BOSS_EXTRUDE4_DEPTH)

    # Sketch8 → Cut-Extrude3 (cut)
    with BuildSketch(Plane(origin=(243.895159863, 0, 0), x_dir=(0, 0, -1), z_dir=(1, 0, 0))):
        with Locations(Location((0, -0.522708752, 0), (0, 0, 90))):
            Circle(SKETCH8_R)
    extrude(amount=-CUT_EXTRUDE3_DEPTH, mode=Mode.SUBTRACT)

    # Sketch10 → Boss-Extrude5 (add)
    with SkipClean():  # the faces are left unmerged after this step: merging them gives an invalid solid
        with BuildSketch(Plane.ZY.offset(7.830858013).offset(BOSS_EXTRUDE5_START)):
            with Locations(Location((0, -0.522708752, 0), (0, 0, 128.682187453))):
                Circle(SKETCH10_R)
        extrude(amount=-BOSS_EXTRUDE5_DEPTH)
    add(part.part.scale(1), mode=Mode.REPLACE)  # the faces are merged on a copy

    # Sketch11 → Cut-Extrude5 (cut)
    with BuildSketch(Plane.ZY.offset(17.830858013).offset(CUT_EXTRUDE5_START)):
        with Locations(Location((0, -0.522708752, 0), (0, 0, 90))):
            Circle(SKETCH11_R)
    extrude(amount=CUT_EXTRUDE5_DEPTH, mode=Mode.SUBTRACT)


solid = part.part
